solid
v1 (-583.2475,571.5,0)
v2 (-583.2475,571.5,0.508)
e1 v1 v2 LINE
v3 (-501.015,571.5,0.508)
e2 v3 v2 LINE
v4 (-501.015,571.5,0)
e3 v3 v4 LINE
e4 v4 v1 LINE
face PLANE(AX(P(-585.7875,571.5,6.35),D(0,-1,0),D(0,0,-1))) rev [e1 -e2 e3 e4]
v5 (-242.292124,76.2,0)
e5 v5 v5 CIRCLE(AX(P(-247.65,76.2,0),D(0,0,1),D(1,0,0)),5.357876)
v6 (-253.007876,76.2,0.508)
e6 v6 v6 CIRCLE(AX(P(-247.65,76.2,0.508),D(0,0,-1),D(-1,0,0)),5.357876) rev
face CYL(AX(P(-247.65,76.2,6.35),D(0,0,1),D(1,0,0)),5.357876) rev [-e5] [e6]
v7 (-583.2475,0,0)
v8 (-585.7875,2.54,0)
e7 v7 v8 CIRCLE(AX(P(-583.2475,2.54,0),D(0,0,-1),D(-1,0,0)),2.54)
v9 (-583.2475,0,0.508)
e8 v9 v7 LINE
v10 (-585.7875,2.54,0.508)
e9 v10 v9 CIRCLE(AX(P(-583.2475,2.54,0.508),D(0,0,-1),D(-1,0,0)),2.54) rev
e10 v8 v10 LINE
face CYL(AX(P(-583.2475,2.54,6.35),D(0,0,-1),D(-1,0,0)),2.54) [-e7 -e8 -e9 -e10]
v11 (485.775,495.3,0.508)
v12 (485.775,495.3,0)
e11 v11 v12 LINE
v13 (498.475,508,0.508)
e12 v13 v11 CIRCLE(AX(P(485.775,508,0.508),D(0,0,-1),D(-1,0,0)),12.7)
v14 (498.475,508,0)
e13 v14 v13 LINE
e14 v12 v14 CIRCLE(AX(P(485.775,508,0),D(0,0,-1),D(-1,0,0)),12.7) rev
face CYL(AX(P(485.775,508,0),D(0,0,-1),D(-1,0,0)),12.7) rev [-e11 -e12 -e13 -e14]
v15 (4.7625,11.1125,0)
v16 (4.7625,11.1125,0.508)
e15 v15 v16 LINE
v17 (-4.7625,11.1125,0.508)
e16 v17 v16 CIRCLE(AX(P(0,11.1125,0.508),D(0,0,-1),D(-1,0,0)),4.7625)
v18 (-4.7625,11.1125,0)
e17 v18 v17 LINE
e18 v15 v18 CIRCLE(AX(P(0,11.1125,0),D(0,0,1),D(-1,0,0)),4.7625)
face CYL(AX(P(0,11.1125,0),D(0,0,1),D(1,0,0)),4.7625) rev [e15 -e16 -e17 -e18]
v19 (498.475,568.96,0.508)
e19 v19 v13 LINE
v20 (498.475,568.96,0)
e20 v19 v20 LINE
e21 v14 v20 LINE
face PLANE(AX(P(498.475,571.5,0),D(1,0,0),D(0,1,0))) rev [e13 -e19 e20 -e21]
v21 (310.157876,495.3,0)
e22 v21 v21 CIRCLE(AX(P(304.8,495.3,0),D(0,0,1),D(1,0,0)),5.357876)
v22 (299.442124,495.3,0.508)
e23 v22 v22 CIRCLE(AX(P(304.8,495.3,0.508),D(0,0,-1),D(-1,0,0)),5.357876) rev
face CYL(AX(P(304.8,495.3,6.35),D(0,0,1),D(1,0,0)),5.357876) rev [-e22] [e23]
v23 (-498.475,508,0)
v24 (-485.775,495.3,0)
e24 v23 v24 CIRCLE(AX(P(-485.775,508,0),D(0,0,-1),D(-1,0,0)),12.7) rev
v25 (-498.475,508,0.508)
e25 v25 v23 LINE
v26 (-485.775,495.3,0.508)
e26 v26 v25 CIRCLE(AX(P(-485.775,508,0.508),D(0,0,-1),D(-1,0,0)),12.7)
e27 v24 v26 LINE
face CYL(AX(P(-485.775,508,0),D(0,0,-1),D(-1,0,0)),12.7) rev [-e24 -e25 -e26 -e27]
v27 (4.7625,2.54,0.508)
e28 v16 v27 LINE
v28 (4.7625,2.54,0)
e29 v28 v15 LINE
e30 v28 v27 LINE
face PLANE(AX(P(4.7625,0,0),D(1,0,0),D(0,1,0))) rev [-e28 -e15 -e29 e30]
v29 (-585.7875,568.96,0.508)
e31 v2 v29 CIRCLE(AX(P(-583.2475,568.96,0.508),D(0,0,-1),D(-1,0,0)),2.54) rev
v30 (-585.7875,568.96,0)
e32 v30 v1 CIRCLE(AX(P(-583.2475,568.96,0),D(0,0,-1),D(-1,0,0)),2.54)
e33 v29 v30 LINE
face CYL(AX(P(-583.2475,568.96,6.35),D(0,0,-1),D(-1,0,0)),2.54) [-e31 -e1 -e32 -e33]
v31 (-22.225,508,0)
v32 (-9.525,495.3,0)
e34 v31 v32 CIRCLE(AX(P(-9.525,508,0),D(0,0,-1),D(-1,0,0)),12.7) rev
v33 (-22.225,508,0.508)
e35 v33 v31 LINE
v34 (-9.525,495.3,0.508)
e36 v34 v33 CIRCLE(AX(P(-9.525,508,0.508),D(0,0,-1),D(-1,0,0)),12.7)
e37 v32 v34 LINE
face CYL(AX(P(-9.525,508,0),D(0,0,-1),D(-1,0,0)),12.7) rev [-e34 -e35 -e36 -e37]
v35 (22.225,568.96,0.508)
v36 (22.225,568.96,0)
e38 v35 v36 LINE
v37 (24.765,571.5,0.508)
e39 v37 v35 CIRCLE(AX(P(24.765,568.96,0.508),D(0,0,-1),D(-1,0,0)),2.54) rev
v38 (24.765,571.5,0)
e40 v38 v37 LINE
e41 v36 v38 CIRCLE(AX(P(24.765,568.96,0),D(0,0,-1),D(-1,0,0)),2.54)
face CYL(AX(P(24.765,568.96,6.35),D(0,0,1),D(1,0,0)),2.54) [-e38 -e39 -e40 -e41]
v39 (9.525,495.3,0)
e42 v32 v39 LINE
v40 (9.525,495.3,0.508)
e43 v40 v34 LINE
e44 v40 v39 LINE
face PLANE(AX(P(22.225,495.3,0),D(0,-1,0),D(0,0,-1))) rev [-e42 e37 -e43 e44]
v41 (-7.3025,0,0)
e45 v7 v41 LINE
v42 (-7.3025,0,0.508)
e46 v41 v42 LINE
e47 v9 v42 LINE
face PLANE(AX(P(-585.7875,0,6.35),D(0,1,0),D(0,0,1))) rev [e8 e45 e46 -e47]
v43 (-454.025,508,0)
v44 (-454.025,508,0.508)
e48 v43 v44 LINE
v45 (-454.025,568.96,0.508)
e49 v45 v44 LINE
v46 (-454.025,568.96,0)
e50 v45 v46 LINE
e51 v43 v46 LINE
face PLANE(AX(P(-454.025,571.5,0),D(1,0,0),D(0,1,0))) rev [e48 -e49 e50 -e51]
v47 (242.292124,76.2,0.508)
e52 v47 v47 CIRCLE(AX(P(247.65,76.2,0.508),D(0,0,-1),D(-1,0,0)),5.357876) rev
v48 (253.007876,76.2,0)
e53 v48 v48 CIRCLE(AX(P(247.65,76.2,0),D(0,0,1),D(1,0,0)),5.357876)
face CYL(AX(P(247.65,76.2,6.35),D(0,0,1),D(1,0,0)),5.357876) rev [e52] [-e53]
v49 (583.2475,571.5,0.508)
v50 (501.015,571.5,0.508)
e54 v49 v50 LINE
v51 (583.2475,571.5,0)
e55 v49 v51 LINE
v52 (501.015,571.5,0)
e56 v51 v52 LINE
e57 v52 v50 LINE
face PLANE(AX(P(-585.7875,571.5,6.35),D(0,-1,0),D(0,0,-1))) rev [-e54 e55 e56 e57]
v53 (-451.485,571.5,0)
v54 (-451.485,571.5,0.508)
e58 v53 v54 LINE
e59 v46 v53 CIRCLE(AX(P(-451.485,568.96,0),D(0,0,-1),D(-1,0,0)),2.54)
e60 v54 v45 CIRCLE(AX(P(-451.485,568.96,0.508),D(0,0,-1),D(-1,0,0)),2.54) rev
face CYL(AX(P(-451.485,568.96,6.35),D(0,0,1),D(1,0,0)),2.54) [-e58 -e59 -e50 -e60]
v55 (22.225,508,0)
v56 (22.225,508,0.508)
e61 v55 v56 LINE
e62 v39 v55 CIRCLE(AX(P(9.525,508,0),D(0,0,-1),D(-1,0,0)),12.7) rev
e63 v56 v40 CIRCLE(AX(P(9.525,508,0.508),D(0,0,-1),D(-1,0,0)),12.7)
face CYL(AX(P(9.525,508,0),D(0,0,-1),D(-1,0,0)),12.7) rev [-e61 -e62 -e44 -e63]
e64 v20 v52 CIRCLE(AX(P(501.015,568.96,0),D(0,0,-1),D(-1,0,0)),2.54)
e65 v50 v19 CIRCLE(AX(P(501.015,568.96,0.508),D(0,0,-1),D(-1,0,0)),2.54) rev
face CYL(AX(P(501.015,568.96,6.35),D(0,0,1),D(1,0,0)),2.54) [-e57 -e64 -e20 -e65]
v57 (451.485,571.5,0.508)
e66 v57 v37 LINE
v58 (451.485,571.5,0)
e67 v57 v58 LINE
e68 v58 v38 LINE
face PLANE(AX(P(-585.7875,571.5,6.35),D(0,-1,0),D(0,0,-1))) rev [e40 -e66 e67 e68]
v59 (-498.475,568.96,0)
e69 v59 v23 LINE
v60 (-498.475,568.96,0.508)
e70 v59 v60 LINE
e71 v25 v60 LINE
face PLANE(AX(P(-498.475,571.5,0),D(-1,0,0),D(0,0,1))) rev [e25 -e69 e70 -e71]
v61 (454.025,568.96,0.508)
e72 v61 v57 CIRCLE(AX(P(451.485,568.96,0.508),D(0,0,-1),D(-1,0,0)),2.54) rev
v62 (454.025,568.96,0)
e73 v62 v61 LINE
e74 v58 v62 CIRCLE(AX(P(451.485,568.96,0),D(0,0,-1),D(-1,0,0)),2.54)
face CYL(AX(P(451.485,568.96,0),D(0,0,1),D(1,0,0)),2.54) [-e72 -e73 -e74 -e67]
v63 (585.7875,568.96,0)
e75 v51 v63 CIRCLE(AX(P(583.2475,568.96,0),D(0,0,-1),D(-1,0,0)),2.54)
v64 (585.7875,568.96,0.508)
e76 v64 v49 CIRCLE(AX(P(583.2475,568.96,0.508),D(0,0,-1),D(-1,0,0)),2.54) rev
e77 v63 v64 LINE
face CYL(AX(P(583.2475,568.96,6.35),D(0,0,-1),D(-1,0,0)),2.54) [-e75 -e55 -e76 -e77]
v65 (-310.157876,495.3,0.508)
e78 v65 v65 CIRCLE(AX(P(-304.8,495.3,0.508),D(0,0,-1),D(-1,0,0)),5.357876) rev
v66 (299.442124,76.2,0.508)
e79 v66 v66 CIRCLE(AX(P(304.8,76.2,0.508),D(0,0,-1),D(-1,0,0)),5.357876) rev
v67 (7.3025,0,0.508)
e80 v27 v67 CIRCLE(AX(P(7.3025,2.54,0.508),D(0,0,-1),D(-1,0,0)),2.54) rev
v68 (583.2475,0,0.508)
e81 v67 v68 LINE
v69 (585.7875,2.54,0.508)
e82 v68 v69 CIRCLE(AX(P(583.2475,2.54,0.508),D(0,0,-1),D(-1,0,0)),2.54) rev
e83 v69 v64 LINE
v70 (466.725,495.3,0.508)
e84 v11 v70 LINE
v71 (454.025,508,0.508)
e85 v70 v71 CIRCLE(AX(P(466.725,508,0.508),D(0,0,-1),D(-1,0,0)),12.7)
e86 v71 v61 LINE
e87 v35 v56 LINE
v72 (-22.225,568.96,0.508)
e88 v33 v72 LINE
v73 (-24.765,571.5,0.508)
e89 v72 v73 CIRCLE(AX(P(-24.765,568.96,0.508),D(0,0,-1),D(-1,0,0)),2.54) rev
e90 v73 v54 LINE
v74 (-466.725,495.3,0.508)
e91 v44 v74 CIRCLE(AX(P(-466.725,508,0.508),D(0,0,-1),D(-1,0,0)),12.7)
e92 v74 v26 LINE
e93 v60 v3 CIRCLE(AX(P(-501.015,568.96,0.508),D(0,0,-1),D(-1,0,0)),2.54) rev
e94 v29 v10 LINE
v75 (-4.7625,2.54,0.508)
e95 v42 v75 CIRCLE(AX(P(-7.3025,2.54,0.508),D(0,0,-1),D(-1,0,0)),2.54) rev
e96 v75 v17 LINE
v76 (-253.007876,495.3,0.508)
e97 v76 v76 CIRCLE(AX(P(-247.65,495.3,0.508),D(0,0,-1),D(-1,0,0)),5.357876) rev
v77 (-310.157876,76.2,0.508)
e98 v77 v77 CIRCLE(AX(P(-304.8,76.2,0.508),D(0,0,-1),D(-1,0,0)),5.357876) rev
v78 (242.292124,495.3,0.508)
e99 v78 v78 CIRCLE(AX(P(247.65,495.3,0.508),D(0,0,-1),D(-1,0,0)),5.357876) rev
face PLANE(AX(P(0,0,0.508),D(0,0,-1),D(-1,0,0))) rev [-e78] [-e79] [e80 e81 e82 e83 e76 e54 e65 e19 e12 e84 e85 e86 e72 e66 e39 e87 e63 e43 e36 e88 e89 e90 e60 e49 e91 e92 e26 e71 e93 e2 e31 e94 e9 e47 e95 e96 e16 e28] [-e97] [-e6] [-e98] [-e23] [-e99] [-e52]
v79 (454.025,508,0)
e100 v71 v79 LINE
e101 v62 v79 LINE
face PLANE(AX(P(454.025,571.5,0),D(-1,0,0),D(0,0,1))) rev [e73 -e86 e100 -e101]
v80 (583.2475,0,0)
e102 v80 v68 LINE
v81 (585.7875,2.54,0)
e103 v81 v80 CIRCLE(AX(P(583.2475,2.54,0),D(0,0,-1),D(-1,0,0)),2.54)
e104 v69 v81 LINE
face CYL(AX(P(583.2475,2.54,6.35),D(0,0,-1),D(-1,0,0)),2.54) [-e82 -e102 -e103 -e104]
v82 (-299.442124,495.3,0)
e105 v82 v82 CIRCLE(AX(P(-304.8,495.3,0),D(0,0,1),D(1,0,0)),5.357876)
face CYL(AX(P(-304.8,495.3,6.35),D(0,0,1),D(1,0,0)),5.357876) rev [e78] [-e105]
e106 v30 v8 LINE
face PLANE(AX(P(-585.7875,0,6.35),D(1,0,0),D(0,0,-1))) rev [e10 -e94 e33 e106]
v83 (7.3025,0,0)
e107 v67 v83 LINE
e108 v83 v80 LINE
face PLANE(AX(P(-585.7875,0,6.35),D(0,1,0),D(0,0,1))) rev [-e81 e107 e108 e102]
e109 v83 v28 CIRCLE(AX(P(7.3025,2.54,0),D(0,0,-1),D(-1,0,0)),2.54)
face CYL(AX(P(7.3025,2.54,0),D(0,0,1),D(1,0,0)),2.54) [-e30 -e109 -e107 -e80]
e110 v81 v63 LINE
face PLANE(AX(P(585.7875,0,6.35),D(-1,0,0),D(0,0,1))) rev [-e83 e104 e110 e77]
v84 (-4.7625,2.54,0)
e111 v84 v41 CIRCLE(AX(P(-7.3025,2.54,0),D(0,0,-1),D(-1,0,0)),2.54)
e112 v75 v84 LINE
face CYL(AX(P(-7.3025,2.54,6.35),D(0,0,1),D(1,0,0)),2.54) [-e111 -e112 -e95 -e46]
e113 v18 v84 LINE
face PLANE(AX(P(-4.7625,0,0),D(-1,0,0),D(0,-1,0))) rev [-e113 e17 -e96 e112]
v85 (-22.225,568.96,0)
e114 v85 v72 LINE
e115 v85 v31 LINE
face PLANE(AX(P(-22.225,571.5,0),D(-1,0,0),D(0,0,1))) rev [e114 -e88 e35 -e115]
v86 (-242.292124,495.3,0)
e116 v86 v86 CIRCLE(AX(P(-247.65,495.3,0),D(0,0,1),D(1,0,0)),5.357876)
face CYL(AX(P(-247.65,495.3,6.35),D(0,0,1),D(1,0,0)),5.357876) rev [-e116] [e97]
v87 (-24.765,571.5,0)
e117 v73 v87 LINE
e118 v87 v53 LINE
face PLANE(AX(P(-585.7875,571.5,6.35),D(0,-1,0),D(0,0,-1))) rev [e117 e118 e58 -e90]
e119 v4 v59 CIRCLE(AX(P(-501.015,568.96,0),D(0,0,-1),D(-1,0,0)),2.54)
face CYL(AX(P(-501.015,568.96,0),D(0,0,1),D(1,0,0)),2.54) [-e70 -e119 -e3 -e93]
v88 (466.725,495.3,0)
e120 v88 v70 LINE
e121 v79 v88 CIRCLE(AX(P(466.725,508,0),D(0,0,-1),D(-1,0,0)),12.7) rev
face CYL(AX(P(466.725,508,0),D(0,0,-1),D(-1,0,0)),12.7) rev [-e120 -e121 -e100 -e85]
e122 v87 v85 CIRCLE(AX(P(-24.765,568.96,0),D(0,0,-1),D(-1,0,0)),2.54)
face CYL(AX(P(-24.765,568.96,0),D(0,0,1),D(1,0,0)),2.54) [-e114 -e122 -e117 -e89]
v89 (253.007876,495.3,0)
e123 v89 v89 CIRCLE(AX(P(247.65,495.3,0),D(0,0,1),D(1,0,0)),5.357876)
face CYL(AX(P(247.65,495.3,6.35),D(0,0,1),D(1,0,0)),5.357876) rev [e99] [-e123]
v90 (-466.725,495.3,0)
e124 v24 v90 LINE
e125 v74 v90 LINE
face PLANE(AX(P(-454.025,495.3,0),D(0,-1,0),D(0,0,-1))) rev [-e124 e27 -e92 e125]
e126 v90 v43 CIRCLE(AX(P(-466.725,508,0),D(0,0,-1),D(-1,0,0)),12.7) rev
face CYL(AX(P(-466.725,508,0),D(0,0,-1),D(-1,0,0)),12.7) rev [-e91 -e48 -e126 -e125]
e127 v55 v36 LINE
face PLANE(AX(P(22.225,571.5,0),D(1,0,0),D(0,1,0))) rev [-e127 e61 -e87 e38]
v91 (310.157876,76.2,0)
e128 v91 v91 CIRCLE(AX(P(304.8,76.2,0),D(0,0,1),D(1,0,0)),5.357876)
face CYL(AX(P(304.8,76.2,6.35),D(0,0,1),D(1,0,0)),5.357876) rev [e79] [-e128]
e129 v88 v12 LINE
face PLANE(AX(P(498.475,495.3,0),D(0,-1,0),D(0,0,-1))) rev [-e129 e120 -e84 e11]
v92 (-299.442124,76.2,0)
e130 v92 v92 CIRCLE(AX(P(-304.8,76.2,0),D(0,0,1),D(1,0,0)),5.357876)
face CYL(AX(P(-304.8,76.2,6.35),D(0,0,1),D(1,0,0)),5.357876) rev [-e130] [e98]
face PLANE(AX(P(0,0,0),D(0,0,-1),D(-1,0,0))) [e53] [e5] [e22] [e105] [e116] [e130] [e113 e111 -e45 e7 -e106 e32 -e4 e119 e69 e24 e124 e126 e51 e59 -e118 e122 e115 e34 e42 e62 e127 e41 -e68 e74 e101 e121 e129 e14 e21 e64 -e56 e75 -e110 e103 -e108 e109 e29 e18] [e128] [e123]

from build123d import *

# Parameters (mm, degrees)
GE_22344_OUTLINE_R = 5.357876
GE_22344_DEPTH     = 6.35
CUT_EXTRUDE1_START = -5.842
CUT_EXTRUDE1_DEPTH = 5.842


# Read off the part's stored shape, not the designer's step: GE-22344
with BuildPart() as part:
    # GE-22344 outline → GE-22344 (new body)
    with BuildSketch(Plane.XY):
        with BuildLine():
            Line((7.3025, 0), (583.2475, 0))
            ThreePointArc((583.2475, 0), (585.043551224, 0.743948776), (585.7875, 2.54))
            Line((585.7875, 2.54), (585.7875, 568.96))
            ThreePointArc((585.7875, 568.96), (585.043551224, 570.756051224), (583.2475, 571.5))
            Line((583.2475, 571.5), (501.015, 571.5))
            ThreePointArc((501.015, 571.5), (499.218948776, 570.756051224), (498.475, 568.96))
            Line((498.475, 568.96), (498.475, 508))
            ThreePointArc((498.475, 508), (494.755256121, 499.019743879), (485.775, 495.3))
            Line((485.775, 495.3), (466.725, 495.3))
            ThreePointArc((466.725, 495.3), (457.744743879, 499.019743879), (454.025, 508))
            Line((454.025, 508), (454.025, 568.96))
            ThreePointArc((454.025, 568.96), (453.281051224, 570.756051224), (451.485, 571.5))
            Line((451.485, 571.5), (24.765, 571.5))
            ThreePointArc((24.765, 571.5), (22.968948776, 570.756051224), (22.225, 568.96))
            Line((22.225, 568.96), (22.225, 508))
            ThreePointArc((22.225, 508), (18.505256121, 499.019743879), (9.525, 495.3))
            Line((9.525, 495.3), (-9.525, 495.3))
            ThreePointArc((-9.525, 495.3), (-18.505256121, 499.019743879), (-22.225, 508))
            Line((-22.225, 508), (-22.225, 568.96))
            ThreePointArc((-22.225, 568.96), (-22.968948776, 570.756051224), (-24.765, 571.5))
            Line((-24.765, 571.5), (-451.485, 571.5))
            ThreePointArc((-451.485, 571.5), (-453.281051224, 570.756051224), (-454.025, 568.96))
            Line((-454.025, 568.96), (-454.025, 508))
            ThreePointArc((-454.025, 508), (-457.744743879, 499.019743879), (-466.725, 495.3))
            Line((-466.725, 495.3), (-485.775, 495.3))
            ThreePointArc((-485.775, 495.3), (-494.755256121, 499.019743879), (-498.475, 508))
            Line((-498.475, 508), (-498.475, 568.96))
            ThreePointArc((-498.475, 568.96), (-499.218948776, 570.756051224), (-501.015, 571.5))
            Line((-501.015, 571.5), (-583.2475, 571.5))
            ThreePointArc((-583.2475, 571.5), (-585.043551224, 570.756051224), (-585.7875, 568.96))
            Line((-585.7875, 568.96), (-585.7875, 2.54))
            ThreePointArc((-585.7875, 2.54), (-585.043551224, 0.743948776), (-583.2475, 0))
            Line((-583.2475, 0), (-7.3025, 0))
            ThreePointArc((-7.3025, 0), (-5.506448776, 0.743948776), (-4.7625, 2.54))
            Line((-4.7625, 2.54), (-4.7625, 11.1125))
            ThreePointArc((-4.7625, 11.1125), (0, 15.875), (4.7625, 11.1125))
            Line((4.7625, 11.1125), (4.7625, 2.54))
            ThreePointArc((4.7625, 2.54), (5.506448776, 0.743948776), (7.3025, 0))
        make_face()
        with Locations((-304.8, 76.2)):
            Circle(GE_22344_OUTLINE_R, mode=Mode.SUBTRACT)
        with Locations((-247.65, 76.2)):
            Circle(GE_22344_OUTLINE_R, mode=Mode.SUBTRACT)
        with Locations((247.65, 76.2)):
            Circle(GE_22344_OUTLINE_R, mode=Mode.SUBTRACT)
        with Locations((304.8, 76.2)):
            Circle(GE_22344_OUTLINE_R, mode=Mode.SUBTRACT)
        with Locations((-304.8, 495.3)):
            Circle(GE_22344_OUTLINE_R, mode=Mode.SUBTRACT)
        with Locations((-247.65, 495.3)):
            Circle(GE_22344_OUTLINE_R, mode=Mode.SUBTRACT)
        with Locations((247.65, 495.3)):
            Circle(GE_22344_OUTLINE_R, mode=Mode.SUBTRACT)
        with Locations((304.8, 495.3)):
            Circle(GE_22344_OUTLINE_R, mode=Mode.SUBTRACT)
    extrude(amount=GE_22344_DEPTH)

    # Sketch4 → Cut-Extrude1 (cut)
    with BuildSketch(Plane.XY.offset(6.35).offset(CUT_EXTRUDE1_START)):
        with BuildLine():
            Line((-583.2475, 0), (-7.3025, 0))
            ThreePointArc((-7.3025, 0), (-5.506448776, 0.743948776), (-4.7625, 2.54))
            Line((-4.7625, 2.54), (-4.7625, 11.1125))
            ThreePointArc((-4.7625, 11.1125), (0, 15.875), (4.7625, 11.1125))
            Line((4.7625, 11.1125), (4.7625, 2.54))
            ThreePointArc((4.7625, 2.54), (5.506448776, 0.743948776), (7.3025, 0))
            Line((7.3025, 0), (583.2475, 0))
            ThreePointArc((583.2475, 0), (585.043551224, 0.743948776), (585.7875, 2.54))
            Line((585.7875, 2.54), (585.7875, 568.96))
            ThreePointArc((585.7875, 568.96), (585.043551224, 570.756051224), (583.2475, 571.5))
            Line((583.2475, 571.5), (501.015, 571.5))
            ThreePointArc((501.015, 571.5), (499.218948776, 570.756051224), (498.475, 568.96))
            Line((498.475, 568.96), (498.475, 508))
            ThreePointArc((498.475, 508), (494.755256121, 499.019743879), (485.775, 495.3))
            Line((485.775, 495.3), (466.725, 495.3))
            ThreePointArc((466.725, 495.3), (457.744743879, 499.019743879), (454.025, 508))
            Line((454.025, 508), (454.025, 568.96))
            ThreePointArc((454.025, 568.96), (453.281051224, 570.756051224), (451.485, 571.5))
            Line((451.485, 571.5), (24.765, 571.5))
            ThreePointArc((24.765, 571.5), (22.968948776, 570.756051224), (22.225, 568.96))
            Line((22.225, 568.96), (22.225, 508))
            ThreePointArc((22.225, 508), (18.505256121, 499.019743879), (9.525, 495.3))
            Line((9.525, 495.3), (-9.525, 495.3))
            ThreePointArc((-9.525, 495.3), (-18.505256121, 499.019743879), (-22.225, 508))
            Line((-22.225, 508), (-22.225, 568.96))
            ThreePointArc((-22.225, 568.96), (-22.968948776, 570.756051224), (-24.765, 571.5))
            Line((-24.765, 571.5), (-451.485, 571.5))
            ThreePointArc((-451.485, 571.5), (-453.281051224, 570.756051224), (-454.025, 568.96))
            Line((-454.025, 568.96), (-454.025, 508))
            ThreePointArc((-454.025, 508), (-457.744743879, 499.019743879), (-466.725, 495.3))
            Line((-466.725, 495.3), (-485.775, 495.3))
            ThreePointArc((-485.775, 495.3), (-494.755256121, 499.019743879), (-498.475, 508))
            Line((-498.475, 508), (-498.475, 568.96))
            ThreePointArc((-498.475, 568.96), (-499.218948776, 570.756051224), (-501.015, 571.5))
            Line((-501.015, 571.5), (-583.2475, 571.5))
            ThreePointArc((-583.2475, 571.5), (-585.043551224, 570.756051224), (-585.7875, 568.96))
            Line((-585.7875, 568.96), (-585.7875, 2.54))
            ThreePointArc((-585.7875, 2.54), (-585.043551224, 0.743948776), (-583.2475, 0))
        make_face()
    extrude(amount=CUT_EXTRUDE1_DEPTH, mode=Mode.SUBTRACT)


solid = part.part
